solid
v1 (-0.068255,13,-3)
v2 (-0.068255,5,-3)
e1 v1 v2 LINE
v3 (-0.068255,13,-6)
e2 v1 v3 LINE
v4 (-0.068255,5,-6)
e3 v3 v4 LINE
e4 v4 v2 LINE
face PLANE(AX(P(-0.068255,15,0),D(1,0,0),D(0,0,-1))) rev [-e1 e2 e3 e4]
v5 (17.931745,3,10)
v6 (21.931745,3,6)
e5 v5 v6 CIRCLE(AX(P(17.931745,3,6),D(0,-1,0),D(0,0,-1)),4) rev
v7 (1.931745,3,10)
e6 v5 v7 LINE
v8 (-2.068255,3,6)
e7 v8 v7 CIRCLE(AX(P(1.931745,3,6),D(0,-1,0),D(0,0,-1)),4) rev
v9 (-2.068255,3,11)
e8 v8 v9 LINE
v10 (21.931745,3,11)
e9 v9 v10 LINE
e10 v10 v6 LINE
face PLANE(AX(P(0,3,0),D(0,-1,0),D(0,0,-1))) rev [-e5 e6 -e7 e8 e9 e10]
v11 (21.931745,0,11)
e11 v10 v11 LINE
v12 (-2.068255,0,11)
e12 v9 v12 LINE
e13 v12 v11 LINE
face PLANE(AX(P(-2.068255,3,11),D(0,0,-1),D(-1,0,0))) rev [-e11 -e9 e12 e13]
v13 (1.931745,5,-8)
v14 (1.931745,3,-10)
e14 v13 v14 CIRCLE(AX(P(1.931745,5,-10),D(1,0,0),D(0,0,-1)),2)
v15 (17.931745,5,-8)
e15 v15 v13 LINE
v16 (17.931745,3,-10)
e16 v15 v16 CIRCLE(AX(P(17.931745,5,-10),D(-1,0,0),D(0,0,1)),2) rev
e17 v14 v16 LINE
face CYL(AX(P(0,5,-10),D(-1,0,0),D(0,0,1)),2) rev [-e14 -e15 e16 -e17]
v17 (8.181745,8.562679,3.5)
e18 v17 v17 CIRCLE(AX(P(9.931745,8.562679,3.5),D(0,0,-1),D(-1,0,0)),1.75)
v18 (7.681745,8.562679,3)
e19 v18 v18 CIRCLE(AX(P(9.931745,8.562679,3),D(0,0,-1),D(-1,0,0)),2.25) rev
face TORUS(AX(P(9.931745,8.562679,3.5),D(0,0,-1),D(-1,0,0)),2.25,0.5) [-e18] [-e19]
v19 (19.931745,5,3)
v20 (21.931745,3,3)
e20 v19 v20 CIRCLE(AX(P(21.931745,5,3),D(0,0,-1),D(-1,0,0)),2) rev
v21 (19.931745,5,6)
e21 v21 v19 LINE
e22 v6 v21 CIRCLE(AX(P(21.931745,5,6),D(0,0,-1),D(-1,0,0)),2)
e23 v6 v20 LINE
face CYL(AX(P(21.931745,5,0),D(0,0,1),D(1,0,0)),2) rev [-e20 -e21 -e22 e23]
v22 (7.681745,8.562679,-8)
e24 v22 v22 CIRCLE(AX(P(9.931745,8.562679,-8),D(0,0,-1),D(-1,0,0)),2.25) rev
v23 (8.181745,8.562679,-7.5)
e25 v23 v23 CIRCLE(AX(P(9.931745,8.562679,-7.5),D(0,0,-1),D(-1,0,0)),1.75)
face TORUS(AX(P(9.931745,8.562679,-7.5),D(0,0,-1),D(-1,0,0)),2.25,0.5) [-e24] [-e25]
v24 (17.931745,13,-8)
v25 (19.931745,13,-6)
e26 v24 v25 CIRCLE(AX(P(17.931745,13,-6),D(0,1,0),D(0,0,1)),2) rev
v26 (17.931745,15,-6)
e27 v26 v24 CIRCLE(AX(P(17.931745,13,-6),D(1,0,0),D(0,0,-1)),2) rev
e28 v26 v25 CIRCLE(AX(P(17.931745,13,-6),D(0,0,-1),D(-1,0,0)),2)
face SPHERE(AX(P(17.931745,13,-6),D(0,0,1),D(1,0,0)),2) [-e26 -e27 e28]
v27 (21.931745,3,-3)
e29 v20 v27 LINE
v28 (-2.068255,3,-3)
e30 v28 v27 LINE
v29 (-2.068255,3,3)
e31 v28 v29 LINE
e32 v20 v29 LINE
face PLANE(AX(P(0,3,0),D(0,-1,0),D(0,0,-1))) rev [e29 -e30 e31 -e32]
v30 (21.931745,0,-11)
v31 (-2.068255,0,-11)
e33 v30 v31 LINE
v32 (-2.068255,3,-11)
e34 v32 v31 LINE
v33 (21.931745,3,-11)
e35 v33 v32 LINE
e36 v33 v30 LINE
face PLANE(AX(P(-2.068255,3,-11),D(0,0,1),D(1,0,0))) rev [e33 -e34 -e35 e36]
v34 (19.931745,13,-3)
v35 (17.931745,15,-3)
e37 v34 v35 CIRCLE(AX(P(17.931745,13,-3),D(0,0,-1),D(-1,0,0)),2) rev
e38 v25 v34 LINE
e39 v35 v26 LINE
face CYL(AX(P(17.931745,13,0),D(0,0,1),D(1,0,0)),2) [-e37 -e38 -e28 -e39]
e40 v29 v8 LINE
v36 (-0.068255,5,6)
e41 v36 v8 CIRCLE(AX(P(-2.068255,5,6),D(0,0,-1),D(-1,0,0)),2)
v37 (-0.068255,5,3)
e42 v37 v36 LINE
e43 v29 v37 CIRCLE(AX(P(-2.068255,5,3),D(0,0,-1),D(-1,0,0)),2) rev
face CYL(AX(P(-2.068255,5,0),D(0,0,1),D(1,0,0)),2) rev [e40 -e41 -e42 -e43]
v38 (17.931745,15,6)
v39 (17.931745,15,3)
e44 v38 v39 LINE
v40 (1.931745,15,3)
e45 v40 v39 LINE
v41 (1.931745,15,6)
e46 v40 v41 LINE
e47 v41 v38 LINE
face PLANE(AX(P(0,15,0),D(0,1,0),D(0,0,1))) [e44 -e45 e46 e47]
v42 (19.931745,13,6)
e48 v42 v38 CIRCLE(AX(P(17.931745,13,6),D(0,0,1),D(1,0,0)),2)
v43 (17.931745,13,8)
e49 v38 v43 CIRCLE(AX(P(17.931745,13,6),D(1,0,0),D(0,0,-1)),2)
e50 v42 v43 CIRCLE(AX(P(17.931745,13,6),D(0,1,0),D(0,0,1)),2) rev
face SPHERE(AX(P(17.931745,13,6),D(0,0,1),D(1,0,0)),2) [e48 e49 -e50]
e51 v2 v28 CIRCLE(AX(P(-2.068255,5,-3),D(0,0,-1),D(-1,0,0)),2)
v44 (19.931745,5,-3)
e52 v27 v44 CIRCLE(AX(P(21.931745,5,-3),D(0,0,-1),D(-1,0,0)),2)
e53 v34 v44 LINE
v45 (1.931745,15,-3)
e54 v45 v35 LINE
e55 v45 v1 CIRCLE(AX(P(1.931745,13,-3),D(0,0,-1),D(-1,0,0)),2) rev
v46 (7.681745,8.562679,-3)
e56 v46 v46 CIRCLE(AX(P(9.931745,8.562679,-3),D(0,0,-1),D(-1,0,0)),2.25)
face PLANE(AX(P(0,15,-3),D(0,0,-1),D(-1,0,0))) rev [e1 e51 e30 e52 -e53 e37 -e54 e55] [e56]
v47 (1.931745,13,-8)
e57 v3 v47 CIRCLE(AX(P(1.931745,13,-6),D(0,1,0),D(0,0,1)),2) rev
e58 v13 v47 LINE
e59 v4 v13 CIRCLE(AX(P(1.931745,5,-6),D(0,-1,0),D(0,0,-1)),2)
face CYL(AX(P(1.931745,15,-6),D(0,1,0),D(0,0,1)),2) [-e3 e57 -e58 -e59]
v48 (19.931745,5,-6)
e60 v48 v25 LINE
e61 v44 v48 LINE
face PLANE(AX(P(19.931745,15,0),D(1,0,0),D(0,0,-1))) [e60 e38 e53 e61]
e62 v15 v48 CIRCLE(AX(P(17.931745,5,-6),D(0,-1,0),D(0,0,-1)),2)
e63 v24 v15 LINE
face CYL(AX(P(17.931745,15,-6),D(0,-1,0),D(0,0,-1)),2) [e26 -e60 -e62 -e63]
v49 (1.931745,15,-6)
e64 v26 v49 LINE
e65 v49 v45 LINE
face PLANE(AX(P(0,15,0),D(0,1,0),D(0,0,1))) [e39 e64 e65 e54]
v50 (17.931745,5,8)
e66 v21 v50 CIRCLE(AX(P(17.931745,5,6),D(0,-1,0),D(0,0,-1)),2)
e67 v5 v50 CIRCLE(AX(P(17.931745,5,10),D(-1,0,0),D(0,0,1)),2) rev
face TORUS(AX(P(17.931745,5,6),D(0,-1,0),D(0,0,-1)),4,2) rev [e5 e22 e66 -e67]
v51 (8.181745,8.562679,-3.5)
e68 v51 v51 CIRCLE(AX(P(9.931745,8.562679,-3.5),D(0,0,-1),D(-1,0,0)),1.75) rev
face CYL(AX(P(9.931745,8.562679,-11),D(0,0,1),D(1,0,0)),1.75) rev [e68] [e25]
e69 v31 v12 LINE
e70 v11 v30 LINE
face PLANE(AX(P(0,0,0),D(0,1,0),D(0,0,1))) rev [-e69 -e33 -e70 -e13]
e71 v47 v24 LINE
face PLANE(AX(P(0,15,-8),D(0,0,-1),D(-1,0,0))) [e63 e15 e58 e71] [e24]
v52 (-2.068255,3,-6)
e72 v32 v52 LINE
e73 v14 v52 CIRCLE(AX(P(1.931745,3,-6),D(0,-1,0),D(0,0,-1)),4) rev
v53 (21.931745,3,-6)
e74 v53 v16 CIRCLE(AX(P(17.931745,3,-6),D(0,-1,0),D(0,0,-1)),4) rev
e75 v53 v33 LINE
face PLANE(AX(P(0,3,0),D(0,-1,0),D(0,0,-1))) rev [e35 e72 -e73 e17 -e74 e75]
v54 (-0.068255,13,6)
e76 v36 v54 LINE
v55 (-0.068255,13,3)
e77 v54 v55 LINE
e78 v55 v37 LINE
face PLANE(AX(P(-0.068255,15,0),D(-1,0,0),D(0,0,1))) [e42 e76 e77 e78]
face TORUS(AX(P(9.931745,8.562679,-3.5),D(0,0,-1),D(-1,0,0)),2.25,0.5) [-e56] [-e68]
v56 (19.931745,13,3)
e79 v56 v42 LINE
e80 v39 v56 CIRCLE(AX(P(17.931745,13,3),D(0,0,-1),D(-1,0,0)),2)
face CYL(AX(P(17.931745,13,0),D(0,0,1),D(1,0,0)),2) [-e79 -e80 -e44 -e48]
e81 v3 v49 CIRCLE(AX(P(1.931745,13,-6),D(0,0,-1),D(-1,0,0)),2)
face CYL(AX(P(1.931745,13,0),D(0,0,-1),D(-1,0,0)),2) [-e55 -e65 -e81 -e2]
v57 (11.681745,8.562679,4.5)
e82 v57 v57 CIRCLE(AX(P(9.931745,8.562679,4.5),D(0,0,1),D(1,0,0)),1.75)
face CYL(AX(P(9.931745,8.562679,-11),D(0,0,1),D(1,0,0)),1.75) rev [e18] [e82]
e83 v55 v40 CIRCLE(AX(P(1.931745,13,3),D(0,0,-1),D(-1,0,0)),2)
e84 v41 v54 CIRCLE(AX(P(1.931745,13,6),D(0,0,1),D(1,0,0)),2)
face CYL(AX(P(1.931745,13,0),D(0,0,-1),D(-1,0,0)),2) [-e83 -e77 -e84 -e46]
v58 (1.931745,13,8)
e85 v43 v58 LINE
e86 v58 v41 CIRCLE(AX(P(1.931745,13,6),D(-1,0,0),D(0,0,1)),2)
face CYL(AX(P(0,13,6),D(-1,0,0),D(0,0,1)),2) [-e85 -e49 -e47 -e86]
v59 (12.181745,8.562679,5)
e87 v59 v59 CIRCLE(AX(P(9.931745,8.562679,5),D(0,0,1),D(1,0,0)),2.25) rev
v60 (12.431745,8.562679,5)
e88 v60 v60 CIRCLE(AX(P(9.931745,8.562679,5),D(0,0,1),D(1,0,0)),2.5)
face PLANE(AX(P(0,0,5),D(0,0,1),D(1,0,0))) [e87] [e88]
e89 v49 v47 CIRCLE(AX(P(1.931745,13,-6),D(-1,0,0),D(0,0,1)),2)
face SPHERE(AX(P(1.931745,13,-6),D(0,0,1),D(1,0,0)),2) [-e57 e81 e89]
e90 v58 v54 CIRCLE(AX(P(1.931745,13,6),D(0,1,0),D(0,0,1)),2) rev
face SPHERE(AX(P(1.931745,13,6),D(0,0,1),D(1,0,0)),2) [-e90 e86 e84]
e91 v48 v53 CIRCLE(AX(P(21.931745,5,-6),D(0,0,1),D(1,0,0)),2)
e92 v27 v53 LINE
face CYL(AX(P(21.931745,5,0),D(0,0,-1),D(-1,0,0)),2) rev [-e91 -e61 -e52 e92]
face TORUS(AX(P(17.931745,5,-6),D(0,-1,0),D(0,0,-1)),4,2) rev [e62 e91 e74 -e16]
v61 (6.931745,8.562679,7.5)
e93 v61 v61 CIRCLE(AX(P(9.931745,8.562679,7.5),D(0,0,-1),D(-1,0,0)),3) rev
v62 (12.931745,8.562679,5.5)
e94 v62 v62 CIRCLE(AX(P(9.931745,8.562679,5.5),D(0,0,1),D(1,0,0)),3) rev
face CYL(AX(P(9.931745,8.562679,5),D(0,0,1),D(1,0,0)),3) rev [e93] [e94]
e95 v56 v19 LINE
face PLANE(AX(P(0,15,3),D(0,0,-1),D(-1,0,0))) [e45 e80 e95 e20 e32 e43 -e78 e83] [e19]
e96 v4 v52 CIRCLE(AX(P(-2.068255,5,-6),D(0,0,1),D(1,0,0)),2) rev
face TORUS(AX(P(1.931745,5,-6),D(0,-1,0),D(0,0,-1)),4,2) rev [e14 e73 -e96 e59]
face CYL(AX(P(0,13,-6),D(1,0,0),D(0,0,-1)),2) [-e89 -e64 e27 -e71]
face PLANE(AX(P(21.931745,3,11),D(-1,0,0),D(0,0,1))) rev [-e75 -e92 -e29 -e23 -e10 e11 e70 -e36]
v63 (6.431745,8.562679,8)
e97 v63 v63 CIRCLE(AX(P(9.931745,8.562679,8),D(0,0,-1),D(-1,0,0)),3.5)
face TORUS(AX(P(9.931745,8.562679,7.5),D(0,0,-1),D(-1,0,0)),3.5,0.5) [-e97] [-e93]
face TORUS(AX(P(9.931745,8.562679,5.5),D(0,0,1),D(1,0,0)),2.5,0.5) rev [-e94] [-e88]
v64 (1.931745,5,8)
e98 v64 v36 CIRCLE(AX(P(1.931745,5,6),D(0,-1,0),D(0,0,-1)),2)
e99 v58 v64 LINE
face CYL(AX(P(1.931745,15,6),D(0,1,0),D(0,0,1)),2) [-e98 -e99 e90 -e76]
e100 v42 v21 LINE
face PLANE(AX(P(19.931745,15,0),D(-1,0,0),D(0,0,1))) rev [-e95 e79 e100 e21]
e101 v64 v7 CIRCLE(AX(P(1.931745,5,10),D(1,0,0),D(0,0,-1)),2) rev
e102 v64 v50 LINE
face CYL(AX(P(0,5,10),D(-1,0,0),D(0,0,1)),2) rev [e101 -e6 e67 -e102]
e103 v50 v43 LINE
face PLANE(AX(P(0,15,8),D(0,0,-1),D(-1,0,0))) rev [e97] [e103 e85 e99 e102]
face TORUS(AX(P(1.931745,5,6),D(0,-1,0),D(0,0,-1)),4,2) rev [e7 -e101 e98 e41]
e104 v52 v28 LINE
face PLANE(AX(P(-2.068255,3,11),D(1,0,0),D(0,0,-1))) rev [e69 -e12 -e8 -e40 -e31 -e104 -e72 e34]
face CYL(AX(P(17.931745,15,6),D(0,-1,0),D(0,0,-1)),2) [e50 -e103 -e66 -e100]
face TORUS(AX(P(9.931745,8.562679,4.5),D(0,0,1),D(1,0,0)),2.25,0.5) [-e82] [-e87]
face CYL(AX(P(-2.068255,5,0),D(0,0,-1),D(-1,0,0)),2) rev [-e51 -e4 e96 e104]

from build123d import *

# Parameters (mm, degrees)
SKETCH1_W             = 20
SKETCH1_H             = 5
BOSS_EXTRUDE1_DEPTH   = 15
BOSS_EXTRUDE1_2_DEPTH = 15
SKETCH2_R             = 1.75
CUT_EXTRUDE1_DEPTH    = 19
SKETCH2_3_R           = 3
SKETCH2_3_R_2         = 1.75
CUT_EXTRUDE2_DEPTH    = 3
SKETCH1_3_W           = 24
SKETCH1_3_H           = 22
SKETCH1_3_W_2         = 20
SKETCH1_3_H_2         = 5
BOSS_EXTRUDE2_DEPTH   = 3
FILLET1_R             = 2
FILLET2_R             = 0.5


with BuildPart() as part:
    # Sketch1 → Boss-Extrude1 (new body)
    with BuildSketch(Plane(origin=(0, 0, 0), x_dir=(1, 0, 0), z_dir=(0, 1, 0))):
        with Locations((9.931745104, -5.5)):
            Rectangle(SKETCH1_W, SKETCH1_H)
    extrude(amount=BOSS_EXTRUDE1_DEPTH)


with BuildPart() as body_2:
    # Sketch1 → Boss-Extrude1 2 (new body)
    with BuildSketch(Plane(origin=(0, 0, 0), x_dir=(1, 0, 0), z_dir=(0, 1, 0))):
        with Locations((9.931745104, 5.5)):
            Rectangle(SKETCH1_W, SKETCH1_H)
    extrude(amount=BOSS_EXTRUDE1_2_DEPTH)


with BuildPart() as cut_extrude1_tool:
    # Sketch2 → Cut-Extrude1 (new body)
    with BuildSketch(Plane.XY.offset(8)):
        with Locations(Location((9.931745104, 8.562679124, 0), (0, 0, 180))):
            Circle(SKETCH2_R)
    extrude(amount=-CUT_EXTRUDE1_DEPTH)


with BuildPart() as part_1:
    add(part.part)

    # Cut-Extrude1: cut by cut_extrude1_tool
    add(cut_extrude1_tool.part, mode=Mode.SUBTRACT)

    # Sketch2<3> → Cut-Extrude2 (cut)
    with BuildSketch(Plane.XY.offset(8)):
        with Locations((9.931745104, 8.562679124)):
            Circle(SKETCH2_3_R)
        with Locations(Location((9.931745104, 8.562679124, 0), (0, 0, 180))):
            Circle(SKETCH2_3_R_2, mode=Mode.SUBTRACT)
    extrude(amount=-CUT_EXTRUDE2_DEPTH, mode=Mode.SUBTRACT)



with BuildPart() as body_2_1:
    add(body_2.part)

    # Cut-Extrude1: cut by cut_extrude1_tool
    add(cut_extrude1_tool.part, mode=Mode.SUBTRACT)


with BuildPart() as part_2:
    add(part_1.part)

    add(body_2_1.part)  # Boss-Extrude2 merges body 2
    # Sketch1<3> → Boss-Extrude2 (add)
    with BuildSketch(Plane(origin=(0, 0, 0), x_dir=(1, 0, 0), z_dir=(0, 1, 0))):
        with Locations((9.931745104, 0)):
            Rectangle(SKETCH1_3_W, SKETCH1_3_H)
        with Locations((9.931745104, -5.5)):
            Rectangle(SKETCH1_3_W_2, SKETCH1_3_H_2, mode=Mode.SUBTRACT)
        with Locations((9.931745104, 5.5)):
            Rectangle(SKETCH1_3_W_2, SKETCH1_3_H_2, mode=Mode.SUBTRACT)
    extrude(amount=BOSS_EXTRUDE2_DEPTH)

    # Fillet1
    fillet1_edges = [part_2.edges().sort_by_distance(p)[0] for p in [
        (19.931745104, 15, -5.5),
        (19.931745104, 3, 5.5),
        (-0.068254896, 3, 5.5),
        (9.931745104, 3, 8),
        (-0.068254896, 3, -5.5),
        (19.931745104, 3, -5.5),
        (9.931745104, 3, -8),
        (9.931745104, 15, -8),
        (-0.068254896, 9, 8),
        (19.931745104, 9, 8),
        (-0.068254896, 15, 5.5),
        (9.931745104, 15, 8),
        (19.931745104, 15, 5.5),
        (-0.068254896, 15, -5.5),
        (19.931745104, 9, -8),
        (-0.068254896, 9, -8),
    ]]
    fillet(fillet1_edges, radius=FILLET1_R - 0.0001)  # a hair under: the kernel refuses the full size

    # Fillet2
    fillet2_edges = [part_2.edges().sort_by_distance(p)[0] for p in [
        (11.681745104, 8.562679124, -8),
        (11.681745104, 8.562679124, -3),
        (11.681745104, 8.562679124, 3),
        (11.681745104, 8.562679124, 5),
        (6.931745104, 8.562679124, 8),
        (6.931745104, 8.562679124, 5),
    ]]
    fillet(fillet2_edges, radius=FILLET2_R)


solid = part_2.part
